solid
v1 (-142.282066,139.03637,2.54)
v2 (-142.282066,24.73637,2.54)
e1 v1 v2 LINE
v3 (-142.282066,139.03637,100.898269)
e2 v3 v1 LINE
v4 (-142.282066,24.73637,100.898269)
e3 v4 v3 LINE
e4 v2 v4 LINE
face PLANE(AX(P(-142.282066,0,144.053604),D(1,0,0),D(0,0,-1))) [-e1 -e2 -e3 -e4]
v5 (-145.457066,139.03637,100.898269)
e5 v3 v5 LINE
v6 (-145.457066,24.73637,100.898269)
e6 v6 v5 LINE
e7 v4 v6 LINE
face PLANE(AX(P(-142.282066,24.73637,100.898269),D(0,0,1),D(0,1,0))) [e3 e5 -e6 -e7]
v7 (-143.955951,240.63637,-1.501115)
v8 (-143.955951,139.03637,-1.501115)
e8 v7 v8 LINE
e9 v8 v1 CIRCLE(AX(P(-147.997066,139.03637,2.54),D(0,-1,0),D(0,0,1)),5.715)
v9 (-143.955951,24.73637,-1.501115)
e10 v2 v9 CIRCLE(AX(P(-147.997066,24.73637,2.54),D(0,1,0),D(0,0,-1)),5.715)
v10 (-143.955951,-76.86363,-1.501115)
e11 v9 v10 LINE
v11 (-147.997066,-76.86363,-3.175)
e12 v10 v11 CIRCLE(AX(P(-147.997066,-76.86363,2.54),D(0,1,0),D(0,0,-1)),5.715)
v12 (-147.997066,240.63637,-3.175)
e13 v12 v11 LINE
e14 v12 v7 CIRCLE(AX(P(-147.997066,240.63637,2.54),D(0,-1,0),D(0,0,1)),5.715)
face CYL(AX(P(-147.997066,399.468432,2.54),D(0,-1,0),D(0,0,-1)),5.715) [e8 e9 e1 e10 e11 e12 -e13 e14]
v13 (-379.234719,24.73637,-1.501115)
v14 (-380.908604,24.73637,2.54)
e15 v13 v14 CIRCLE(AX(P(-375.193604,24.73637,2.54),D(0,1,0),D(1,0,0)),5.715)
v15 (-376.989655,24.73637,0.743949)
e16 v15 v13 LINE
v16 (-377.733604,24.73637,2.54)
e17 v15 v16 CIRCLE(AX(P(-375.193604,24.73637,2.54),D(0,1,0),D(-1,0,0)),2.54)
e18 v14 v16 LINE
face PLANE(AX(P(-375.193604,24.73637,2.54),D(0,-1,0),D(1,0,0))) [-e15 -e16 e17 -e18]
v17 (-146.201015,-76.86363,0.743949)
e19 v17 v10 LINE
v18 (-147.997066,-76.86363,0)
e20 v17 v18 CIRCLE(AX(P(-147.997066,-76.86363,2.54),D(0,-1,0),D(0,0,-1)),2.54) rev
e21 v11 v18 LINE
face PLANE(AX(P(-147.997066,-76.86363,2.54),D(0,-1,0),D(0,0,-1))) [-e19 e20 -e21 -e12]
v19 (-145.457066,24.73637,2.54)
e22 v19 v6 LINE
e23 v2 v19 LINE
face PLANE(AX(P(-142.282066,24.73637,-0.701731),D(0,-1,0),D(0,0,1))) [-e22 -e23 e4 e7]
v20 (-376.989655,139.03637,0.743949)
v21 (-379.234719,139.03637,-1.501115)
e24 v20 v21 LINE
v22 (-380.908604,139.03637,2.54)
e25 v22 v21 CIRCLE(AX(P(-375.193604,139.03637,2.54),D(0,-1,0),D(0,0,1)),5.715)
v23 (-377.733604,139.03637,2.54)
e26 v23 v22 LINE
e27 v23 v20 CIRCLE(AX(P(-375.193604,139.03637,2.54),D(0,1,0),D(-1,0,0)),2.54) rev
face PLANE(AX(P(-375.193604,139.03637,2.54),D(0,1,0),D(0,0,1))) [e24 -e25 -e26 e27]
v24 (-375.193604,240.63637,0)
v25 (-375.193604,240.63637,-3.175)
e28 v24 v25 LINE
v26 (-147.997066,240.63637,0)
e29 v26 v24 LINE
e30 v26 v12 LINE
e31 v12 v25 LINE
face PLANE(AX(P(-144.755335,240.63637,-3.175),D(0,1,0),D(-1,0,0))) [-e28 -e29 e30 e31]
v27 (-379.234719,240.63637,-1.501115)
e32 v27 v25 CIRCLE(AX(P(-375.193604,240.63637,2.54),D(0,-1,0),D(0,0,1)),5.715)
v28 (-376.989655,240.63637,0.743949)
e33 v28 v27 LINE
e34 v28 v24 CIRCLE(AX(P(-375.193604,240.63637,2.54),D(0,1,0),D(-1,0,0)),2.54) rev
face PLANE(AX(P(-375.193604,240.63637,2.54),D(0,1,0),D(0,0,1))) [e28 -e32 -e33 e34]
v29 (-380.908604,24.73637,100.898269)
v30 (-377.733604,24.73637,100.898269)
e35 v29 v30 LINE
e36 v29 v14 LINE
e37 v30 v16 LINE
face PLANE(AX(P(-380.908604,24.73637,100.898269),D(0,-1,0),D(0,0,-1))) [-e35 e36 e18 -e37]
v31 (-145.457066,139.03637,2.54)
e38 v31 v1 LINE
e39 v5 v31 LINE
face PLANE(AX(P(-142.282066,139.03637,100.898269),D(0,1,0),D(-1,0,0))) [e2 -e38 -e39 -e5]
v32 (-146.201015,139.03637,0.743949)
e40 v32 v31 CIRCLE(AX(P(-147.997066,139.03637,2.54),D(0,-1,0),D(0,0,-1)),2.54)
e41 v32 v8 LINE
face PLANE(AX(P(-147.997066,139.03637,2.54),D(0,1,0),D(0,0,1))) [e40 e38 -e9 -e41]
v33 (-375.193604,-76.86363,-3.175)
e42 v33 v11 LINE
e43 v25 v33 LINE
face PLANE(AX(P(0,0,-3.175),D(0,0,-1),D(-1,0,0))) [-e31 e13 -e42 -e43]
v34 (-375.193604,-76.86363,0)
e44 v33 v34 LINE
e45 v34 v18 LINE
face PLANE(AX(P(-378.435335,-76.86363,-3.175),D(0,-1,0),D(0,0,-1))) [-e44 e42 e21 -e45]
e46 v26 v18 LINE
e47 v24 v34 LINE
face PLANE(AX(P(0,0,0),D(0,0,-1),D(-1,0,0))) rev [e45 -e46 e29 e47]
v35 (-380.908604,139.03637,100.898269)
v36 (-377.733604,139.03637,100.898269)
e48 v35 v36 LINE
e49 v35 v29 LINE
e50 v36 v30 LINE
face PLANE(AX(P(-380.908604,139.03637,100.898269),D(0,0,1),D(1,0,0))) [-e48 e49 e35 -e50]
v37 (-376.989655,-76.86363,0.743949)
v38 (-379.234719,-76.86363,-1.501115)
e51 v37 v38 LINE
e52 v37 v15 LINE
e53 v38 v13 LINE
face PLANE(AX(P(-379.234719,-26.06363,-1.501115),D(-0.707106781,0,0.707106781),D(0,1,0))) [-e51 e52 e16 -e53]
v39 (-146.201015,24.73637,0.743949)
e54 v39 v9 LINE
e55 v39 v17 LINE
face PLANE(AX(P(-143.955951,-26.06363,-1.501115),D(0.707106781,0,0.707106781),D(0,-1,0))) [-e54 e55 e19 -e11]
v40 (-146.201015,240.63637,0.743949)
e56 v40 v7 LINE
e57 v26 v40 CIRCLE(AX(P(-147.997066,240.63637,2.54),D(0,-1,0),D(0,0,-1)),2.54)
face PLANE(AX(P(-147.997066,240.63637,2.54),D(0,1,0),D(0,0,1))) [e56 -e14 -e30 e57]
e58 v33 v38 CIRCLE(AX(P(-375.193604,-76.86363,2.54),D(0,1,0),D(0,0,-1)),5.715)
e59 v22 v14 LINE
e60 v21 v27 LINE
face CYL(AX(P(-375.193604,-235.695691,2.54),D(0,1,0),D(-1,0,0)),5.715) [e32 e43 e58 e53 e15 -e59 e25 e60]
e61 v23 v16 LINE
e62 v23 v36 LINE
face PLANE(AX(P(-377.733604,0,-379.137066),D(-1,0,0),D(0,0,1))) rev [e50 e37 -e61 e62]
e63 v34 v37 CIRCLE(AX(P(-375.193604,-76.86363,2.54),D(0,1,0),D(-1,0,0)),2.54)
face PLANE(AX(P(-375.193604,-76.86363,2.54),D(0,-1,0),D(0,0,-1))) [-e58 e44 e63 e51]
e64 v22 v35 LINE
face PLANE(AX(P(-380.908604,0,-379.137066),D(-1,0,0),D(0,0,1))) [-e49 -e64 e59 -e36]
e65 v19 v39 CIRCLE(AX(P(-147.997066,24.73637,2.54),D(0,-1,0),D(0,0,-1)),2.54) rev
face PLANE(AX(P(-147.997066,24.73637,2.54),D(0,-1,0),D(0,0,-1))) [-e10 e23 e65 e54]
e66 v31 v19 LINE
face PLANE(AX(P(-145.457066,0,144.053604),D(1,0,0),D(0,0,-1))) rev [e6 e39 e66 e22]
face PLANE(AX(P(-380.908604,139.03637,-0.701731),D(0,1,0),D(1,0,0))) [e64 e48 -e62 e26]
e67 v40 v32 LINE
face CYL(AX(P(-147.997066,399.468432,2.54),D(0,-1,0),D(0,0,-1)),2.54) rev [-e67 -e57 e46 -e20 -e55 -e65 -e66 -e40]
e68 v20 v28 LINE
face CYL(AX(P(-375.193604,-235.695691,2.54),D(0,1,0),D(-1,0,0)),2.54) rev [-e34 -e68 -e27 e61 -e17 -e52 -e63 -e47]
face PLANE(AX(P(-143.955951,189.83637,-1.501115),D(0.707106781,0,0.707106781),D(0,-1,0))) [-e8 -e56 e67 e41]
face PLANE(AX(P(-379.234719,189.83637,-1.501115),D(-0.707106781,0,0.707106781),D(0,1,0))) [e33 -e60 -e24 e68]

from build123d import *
from build123d.topology import SkipClean

# Parameters (mm, degrees)
BASE_FLANGE1_DEPTH     = 3.175
SKETCHED_START         = -76.863629597
SKETCHED_BEND1_DEPTH   = 317.5
SKETCHED_BEND1_2_DEPTH = 101.6
SKETCHED_START_2       = 139.036370403
SKETCHED_BEND1_3_DEPTH = 101.6
SKETCHED_START_3       = 24.736370403
SKETCHED_BEND1_4_DEPTH = 114.3
SKETCHED_BEND1_5_DEPTH = 317.5


# Read off the part's stored shape, not the designer's step: Sketched Bend1
# Sheet-metal steps are written as plain solids
with BuildPart() as part:
    # Sketch1 → Base-Flange1 (new body)
    with BuildSketch(Plane.XY):
        Polygon((-43.155335008, 139.036370403), (-144.755335008, 139.036370403), (-144.755335008, 240.636370403), (-378.435335008, 240.636370403), (-378.435335008, 139.036370403), (-480.035335008, 139.036370403), (-480.035335008, 24.736370403), (-378.435335008, 24.736370403), (-378.435335008, -76.863629597), (-144.755335008, -76.863629597), (-144.755335008, 24.736370403), (-43.155335008, 24.736370403), align=None)
    extrude(amount=-BASE_FLANGE1_DEPTH)

    # Sketched Bend1 outline → Sketched Bend1 (cut)
    with BuildSketch(Plane(origin=(0, 0, 0), x_dir=(1, 0, 0), z_dir=(0, 1, 0)).offset(SKETCHED_START)):
        with BuildLine():
            ThreePointArc((-380.313137759, 0), (-378.20567356, 2.316816086), (-375.193604089, 3.175))
            Line((-375.193604089, 3.175), (-480.035335008, 3.175))
            Line((-480.035335008, 3.175), (-480.035335008, 0))
            Line((-480.035335008, 0), (-380.313137759, 0))
        make_face()
        with BuildLine():
            ThreePointArc((-147.997065928, 3.175), (-144.984996457, 2.316816087), (-142.877532258, 0))
            Line((-142.877532258, 0), (-43.155335008, 0))
            Line((-43.155335008, 0), (-43.155335008, 3.175))
            Line((-43.155335008, 3.175), (-147.997065928, 3.175))
        make_face()
    extrude(amount=SKETCHED_BEND1_DEPTH, mode=Mode.SUBTRACT)

    # Sketched Bend1 2 outline → Sketched Bend1 2 (cut)
    with BuildSketch(Plane(origin=(0, 0, 0), x_dir=(1, 0, 0), z_dir=(0, 1, 0)).offset(SKETCHED_START)):
        Polygon((-377.733604089, 0), (-378.435335008, 0.701730919), (-378.435335008, 0), align=None)
        Polygon((-144.755335008, 0.701730919), (-145.457065927, 0), (-144.755335008, 0), align=None)
    extrude(amount=SKETCHED_BEND1_2_DEPTH, mode=Mode.SUBTRACT)

    # Sketched Bend1 3 outline → Sketched Bend1 3 (cut)
    with BuildSketch(Plane(origin=(0, 0, 0), x_dir=(1, 0, 0), z_dir=(0, 1, 0)).offset(SKETCHED_START_2)):
        Polygon((-377.733604089, 0), (-378.435335008, 0.701730919), (-378.435335008, 0), align=None)
        Polygon((-144.755335008, 0.701730919), (-145.457065927, 0), (-144.755335008, 0), align=None)
    extrude(amount=SKETCHED_BEND1_3_DEPTH, mode=Mode.SUBTRACT)

    # Sketched Bend1 4 outline → Sketched Bend1 4 (add)
    with BuildSketch(Plane(origin=(0, 0, 0), x_dir=(1, 0, 0), z_dir=(0, 1, 0)).offset(SKETCHED_START_3)):
        with BuildLine():
            ThreePointArc((-380.313137759, 0), (-380.757746427, -1.235567159), (-380.908604089, -2.54))
            Line((-380.908604089, -2.54), (-380.908604089, -100.898269081))
            Line((-380.908604089, -100.898269081), (-377.733604089, -100.898269081))
            Line((-377.733604089, -100.898269081), (-377.733604089, -2.54))
            ThreePointArc((-377.733604089, -2.54), (-376.989655313, -0.743948776), (-375.193604089, 0))
            Line((-375.193604089, 0), (-380.313137759, 0))
        make_face()
        with BuildLine():
            ThreePointArc((-147.997065928, 0), (-146.201014704, -0.743948775), (-145.457065928, -2.54))
            Line((-145.457065928, -2.54), (-145.457065928, -100.898269081))
            Line((-145.457065928, -100.898269081), (-142.282065928, -100.898269081))
            Line((-142.282065928, -100.898269081), (-142.282065928, -2.54))
            ThreePointArc((-142.282065928, -2.54), (-142.43292359, -1.235567159), (-142.877532258, 0))
            Line((-142.877532258, 0), (-147.997065928, 0))
        make_face()
    extrude(amount=SKETCHED_BEND1_4_DEPTH)

    # Sketched Bend1 5 outline → Sketched Bend1 5 (add)
    with SkipClean():  # the faces are left unmerged after this step: merging them gives an invalid solid
        with BuildSketch(Plane(origin=(0, 0, 0), x_dir=(1, 0, 0), z_dir=(0, 1, 0)).offset(SKETCHED_START)):
            with BuildLine():
                ThreePointArc((-378.435335008, 2.166634216), (-378.850199632, 1.852099045), (-379.234719343, 1.501115254))
                Line((-379.234719343, 1.501115254), (-378.435335008, 0.701730919))
                Line((-378.435335008, 0.701730919), (-378.435335008, 2.166634216))
            make_face()
            with BuildLine():
                Line((-375.193604089, 0), (-377.733604089, 0))
                Line((-377.733604089, 0), (-376.989655313, -0.743948776))
                ThreePointArc((-376.989655313, -0.743948776), (-376.165620007, -0.193345988), (-375.193604089, 0))
            make_face()
            with BuildLine():
                Line((-145.457065927, 0), (-147.997065928, 0))
                ThreePointArc((-147.997065928, 0), (-147.025050009, -0.193345987), (-146.201014703, -0.743948776))
                Line((-146.201014703, -0.743948776), (-145.457065927, 0))
            make_face()
            with BuildLine():
                ThreePointArc((-143.955950673, 1.501115254), (-144.340470384, 1.852099046), (-144.755335008, 2.166634216))
                Line((-144.755335008, 2.166634216), (-144.755335008, 0.701730919))
                Line((-144.755335008, 0.701730919), (-143.955950673, 1.501115254))
            make_face()
        extrude(amount=SKETCHED_BEND1_5_DEPTH)


solid = part.part
